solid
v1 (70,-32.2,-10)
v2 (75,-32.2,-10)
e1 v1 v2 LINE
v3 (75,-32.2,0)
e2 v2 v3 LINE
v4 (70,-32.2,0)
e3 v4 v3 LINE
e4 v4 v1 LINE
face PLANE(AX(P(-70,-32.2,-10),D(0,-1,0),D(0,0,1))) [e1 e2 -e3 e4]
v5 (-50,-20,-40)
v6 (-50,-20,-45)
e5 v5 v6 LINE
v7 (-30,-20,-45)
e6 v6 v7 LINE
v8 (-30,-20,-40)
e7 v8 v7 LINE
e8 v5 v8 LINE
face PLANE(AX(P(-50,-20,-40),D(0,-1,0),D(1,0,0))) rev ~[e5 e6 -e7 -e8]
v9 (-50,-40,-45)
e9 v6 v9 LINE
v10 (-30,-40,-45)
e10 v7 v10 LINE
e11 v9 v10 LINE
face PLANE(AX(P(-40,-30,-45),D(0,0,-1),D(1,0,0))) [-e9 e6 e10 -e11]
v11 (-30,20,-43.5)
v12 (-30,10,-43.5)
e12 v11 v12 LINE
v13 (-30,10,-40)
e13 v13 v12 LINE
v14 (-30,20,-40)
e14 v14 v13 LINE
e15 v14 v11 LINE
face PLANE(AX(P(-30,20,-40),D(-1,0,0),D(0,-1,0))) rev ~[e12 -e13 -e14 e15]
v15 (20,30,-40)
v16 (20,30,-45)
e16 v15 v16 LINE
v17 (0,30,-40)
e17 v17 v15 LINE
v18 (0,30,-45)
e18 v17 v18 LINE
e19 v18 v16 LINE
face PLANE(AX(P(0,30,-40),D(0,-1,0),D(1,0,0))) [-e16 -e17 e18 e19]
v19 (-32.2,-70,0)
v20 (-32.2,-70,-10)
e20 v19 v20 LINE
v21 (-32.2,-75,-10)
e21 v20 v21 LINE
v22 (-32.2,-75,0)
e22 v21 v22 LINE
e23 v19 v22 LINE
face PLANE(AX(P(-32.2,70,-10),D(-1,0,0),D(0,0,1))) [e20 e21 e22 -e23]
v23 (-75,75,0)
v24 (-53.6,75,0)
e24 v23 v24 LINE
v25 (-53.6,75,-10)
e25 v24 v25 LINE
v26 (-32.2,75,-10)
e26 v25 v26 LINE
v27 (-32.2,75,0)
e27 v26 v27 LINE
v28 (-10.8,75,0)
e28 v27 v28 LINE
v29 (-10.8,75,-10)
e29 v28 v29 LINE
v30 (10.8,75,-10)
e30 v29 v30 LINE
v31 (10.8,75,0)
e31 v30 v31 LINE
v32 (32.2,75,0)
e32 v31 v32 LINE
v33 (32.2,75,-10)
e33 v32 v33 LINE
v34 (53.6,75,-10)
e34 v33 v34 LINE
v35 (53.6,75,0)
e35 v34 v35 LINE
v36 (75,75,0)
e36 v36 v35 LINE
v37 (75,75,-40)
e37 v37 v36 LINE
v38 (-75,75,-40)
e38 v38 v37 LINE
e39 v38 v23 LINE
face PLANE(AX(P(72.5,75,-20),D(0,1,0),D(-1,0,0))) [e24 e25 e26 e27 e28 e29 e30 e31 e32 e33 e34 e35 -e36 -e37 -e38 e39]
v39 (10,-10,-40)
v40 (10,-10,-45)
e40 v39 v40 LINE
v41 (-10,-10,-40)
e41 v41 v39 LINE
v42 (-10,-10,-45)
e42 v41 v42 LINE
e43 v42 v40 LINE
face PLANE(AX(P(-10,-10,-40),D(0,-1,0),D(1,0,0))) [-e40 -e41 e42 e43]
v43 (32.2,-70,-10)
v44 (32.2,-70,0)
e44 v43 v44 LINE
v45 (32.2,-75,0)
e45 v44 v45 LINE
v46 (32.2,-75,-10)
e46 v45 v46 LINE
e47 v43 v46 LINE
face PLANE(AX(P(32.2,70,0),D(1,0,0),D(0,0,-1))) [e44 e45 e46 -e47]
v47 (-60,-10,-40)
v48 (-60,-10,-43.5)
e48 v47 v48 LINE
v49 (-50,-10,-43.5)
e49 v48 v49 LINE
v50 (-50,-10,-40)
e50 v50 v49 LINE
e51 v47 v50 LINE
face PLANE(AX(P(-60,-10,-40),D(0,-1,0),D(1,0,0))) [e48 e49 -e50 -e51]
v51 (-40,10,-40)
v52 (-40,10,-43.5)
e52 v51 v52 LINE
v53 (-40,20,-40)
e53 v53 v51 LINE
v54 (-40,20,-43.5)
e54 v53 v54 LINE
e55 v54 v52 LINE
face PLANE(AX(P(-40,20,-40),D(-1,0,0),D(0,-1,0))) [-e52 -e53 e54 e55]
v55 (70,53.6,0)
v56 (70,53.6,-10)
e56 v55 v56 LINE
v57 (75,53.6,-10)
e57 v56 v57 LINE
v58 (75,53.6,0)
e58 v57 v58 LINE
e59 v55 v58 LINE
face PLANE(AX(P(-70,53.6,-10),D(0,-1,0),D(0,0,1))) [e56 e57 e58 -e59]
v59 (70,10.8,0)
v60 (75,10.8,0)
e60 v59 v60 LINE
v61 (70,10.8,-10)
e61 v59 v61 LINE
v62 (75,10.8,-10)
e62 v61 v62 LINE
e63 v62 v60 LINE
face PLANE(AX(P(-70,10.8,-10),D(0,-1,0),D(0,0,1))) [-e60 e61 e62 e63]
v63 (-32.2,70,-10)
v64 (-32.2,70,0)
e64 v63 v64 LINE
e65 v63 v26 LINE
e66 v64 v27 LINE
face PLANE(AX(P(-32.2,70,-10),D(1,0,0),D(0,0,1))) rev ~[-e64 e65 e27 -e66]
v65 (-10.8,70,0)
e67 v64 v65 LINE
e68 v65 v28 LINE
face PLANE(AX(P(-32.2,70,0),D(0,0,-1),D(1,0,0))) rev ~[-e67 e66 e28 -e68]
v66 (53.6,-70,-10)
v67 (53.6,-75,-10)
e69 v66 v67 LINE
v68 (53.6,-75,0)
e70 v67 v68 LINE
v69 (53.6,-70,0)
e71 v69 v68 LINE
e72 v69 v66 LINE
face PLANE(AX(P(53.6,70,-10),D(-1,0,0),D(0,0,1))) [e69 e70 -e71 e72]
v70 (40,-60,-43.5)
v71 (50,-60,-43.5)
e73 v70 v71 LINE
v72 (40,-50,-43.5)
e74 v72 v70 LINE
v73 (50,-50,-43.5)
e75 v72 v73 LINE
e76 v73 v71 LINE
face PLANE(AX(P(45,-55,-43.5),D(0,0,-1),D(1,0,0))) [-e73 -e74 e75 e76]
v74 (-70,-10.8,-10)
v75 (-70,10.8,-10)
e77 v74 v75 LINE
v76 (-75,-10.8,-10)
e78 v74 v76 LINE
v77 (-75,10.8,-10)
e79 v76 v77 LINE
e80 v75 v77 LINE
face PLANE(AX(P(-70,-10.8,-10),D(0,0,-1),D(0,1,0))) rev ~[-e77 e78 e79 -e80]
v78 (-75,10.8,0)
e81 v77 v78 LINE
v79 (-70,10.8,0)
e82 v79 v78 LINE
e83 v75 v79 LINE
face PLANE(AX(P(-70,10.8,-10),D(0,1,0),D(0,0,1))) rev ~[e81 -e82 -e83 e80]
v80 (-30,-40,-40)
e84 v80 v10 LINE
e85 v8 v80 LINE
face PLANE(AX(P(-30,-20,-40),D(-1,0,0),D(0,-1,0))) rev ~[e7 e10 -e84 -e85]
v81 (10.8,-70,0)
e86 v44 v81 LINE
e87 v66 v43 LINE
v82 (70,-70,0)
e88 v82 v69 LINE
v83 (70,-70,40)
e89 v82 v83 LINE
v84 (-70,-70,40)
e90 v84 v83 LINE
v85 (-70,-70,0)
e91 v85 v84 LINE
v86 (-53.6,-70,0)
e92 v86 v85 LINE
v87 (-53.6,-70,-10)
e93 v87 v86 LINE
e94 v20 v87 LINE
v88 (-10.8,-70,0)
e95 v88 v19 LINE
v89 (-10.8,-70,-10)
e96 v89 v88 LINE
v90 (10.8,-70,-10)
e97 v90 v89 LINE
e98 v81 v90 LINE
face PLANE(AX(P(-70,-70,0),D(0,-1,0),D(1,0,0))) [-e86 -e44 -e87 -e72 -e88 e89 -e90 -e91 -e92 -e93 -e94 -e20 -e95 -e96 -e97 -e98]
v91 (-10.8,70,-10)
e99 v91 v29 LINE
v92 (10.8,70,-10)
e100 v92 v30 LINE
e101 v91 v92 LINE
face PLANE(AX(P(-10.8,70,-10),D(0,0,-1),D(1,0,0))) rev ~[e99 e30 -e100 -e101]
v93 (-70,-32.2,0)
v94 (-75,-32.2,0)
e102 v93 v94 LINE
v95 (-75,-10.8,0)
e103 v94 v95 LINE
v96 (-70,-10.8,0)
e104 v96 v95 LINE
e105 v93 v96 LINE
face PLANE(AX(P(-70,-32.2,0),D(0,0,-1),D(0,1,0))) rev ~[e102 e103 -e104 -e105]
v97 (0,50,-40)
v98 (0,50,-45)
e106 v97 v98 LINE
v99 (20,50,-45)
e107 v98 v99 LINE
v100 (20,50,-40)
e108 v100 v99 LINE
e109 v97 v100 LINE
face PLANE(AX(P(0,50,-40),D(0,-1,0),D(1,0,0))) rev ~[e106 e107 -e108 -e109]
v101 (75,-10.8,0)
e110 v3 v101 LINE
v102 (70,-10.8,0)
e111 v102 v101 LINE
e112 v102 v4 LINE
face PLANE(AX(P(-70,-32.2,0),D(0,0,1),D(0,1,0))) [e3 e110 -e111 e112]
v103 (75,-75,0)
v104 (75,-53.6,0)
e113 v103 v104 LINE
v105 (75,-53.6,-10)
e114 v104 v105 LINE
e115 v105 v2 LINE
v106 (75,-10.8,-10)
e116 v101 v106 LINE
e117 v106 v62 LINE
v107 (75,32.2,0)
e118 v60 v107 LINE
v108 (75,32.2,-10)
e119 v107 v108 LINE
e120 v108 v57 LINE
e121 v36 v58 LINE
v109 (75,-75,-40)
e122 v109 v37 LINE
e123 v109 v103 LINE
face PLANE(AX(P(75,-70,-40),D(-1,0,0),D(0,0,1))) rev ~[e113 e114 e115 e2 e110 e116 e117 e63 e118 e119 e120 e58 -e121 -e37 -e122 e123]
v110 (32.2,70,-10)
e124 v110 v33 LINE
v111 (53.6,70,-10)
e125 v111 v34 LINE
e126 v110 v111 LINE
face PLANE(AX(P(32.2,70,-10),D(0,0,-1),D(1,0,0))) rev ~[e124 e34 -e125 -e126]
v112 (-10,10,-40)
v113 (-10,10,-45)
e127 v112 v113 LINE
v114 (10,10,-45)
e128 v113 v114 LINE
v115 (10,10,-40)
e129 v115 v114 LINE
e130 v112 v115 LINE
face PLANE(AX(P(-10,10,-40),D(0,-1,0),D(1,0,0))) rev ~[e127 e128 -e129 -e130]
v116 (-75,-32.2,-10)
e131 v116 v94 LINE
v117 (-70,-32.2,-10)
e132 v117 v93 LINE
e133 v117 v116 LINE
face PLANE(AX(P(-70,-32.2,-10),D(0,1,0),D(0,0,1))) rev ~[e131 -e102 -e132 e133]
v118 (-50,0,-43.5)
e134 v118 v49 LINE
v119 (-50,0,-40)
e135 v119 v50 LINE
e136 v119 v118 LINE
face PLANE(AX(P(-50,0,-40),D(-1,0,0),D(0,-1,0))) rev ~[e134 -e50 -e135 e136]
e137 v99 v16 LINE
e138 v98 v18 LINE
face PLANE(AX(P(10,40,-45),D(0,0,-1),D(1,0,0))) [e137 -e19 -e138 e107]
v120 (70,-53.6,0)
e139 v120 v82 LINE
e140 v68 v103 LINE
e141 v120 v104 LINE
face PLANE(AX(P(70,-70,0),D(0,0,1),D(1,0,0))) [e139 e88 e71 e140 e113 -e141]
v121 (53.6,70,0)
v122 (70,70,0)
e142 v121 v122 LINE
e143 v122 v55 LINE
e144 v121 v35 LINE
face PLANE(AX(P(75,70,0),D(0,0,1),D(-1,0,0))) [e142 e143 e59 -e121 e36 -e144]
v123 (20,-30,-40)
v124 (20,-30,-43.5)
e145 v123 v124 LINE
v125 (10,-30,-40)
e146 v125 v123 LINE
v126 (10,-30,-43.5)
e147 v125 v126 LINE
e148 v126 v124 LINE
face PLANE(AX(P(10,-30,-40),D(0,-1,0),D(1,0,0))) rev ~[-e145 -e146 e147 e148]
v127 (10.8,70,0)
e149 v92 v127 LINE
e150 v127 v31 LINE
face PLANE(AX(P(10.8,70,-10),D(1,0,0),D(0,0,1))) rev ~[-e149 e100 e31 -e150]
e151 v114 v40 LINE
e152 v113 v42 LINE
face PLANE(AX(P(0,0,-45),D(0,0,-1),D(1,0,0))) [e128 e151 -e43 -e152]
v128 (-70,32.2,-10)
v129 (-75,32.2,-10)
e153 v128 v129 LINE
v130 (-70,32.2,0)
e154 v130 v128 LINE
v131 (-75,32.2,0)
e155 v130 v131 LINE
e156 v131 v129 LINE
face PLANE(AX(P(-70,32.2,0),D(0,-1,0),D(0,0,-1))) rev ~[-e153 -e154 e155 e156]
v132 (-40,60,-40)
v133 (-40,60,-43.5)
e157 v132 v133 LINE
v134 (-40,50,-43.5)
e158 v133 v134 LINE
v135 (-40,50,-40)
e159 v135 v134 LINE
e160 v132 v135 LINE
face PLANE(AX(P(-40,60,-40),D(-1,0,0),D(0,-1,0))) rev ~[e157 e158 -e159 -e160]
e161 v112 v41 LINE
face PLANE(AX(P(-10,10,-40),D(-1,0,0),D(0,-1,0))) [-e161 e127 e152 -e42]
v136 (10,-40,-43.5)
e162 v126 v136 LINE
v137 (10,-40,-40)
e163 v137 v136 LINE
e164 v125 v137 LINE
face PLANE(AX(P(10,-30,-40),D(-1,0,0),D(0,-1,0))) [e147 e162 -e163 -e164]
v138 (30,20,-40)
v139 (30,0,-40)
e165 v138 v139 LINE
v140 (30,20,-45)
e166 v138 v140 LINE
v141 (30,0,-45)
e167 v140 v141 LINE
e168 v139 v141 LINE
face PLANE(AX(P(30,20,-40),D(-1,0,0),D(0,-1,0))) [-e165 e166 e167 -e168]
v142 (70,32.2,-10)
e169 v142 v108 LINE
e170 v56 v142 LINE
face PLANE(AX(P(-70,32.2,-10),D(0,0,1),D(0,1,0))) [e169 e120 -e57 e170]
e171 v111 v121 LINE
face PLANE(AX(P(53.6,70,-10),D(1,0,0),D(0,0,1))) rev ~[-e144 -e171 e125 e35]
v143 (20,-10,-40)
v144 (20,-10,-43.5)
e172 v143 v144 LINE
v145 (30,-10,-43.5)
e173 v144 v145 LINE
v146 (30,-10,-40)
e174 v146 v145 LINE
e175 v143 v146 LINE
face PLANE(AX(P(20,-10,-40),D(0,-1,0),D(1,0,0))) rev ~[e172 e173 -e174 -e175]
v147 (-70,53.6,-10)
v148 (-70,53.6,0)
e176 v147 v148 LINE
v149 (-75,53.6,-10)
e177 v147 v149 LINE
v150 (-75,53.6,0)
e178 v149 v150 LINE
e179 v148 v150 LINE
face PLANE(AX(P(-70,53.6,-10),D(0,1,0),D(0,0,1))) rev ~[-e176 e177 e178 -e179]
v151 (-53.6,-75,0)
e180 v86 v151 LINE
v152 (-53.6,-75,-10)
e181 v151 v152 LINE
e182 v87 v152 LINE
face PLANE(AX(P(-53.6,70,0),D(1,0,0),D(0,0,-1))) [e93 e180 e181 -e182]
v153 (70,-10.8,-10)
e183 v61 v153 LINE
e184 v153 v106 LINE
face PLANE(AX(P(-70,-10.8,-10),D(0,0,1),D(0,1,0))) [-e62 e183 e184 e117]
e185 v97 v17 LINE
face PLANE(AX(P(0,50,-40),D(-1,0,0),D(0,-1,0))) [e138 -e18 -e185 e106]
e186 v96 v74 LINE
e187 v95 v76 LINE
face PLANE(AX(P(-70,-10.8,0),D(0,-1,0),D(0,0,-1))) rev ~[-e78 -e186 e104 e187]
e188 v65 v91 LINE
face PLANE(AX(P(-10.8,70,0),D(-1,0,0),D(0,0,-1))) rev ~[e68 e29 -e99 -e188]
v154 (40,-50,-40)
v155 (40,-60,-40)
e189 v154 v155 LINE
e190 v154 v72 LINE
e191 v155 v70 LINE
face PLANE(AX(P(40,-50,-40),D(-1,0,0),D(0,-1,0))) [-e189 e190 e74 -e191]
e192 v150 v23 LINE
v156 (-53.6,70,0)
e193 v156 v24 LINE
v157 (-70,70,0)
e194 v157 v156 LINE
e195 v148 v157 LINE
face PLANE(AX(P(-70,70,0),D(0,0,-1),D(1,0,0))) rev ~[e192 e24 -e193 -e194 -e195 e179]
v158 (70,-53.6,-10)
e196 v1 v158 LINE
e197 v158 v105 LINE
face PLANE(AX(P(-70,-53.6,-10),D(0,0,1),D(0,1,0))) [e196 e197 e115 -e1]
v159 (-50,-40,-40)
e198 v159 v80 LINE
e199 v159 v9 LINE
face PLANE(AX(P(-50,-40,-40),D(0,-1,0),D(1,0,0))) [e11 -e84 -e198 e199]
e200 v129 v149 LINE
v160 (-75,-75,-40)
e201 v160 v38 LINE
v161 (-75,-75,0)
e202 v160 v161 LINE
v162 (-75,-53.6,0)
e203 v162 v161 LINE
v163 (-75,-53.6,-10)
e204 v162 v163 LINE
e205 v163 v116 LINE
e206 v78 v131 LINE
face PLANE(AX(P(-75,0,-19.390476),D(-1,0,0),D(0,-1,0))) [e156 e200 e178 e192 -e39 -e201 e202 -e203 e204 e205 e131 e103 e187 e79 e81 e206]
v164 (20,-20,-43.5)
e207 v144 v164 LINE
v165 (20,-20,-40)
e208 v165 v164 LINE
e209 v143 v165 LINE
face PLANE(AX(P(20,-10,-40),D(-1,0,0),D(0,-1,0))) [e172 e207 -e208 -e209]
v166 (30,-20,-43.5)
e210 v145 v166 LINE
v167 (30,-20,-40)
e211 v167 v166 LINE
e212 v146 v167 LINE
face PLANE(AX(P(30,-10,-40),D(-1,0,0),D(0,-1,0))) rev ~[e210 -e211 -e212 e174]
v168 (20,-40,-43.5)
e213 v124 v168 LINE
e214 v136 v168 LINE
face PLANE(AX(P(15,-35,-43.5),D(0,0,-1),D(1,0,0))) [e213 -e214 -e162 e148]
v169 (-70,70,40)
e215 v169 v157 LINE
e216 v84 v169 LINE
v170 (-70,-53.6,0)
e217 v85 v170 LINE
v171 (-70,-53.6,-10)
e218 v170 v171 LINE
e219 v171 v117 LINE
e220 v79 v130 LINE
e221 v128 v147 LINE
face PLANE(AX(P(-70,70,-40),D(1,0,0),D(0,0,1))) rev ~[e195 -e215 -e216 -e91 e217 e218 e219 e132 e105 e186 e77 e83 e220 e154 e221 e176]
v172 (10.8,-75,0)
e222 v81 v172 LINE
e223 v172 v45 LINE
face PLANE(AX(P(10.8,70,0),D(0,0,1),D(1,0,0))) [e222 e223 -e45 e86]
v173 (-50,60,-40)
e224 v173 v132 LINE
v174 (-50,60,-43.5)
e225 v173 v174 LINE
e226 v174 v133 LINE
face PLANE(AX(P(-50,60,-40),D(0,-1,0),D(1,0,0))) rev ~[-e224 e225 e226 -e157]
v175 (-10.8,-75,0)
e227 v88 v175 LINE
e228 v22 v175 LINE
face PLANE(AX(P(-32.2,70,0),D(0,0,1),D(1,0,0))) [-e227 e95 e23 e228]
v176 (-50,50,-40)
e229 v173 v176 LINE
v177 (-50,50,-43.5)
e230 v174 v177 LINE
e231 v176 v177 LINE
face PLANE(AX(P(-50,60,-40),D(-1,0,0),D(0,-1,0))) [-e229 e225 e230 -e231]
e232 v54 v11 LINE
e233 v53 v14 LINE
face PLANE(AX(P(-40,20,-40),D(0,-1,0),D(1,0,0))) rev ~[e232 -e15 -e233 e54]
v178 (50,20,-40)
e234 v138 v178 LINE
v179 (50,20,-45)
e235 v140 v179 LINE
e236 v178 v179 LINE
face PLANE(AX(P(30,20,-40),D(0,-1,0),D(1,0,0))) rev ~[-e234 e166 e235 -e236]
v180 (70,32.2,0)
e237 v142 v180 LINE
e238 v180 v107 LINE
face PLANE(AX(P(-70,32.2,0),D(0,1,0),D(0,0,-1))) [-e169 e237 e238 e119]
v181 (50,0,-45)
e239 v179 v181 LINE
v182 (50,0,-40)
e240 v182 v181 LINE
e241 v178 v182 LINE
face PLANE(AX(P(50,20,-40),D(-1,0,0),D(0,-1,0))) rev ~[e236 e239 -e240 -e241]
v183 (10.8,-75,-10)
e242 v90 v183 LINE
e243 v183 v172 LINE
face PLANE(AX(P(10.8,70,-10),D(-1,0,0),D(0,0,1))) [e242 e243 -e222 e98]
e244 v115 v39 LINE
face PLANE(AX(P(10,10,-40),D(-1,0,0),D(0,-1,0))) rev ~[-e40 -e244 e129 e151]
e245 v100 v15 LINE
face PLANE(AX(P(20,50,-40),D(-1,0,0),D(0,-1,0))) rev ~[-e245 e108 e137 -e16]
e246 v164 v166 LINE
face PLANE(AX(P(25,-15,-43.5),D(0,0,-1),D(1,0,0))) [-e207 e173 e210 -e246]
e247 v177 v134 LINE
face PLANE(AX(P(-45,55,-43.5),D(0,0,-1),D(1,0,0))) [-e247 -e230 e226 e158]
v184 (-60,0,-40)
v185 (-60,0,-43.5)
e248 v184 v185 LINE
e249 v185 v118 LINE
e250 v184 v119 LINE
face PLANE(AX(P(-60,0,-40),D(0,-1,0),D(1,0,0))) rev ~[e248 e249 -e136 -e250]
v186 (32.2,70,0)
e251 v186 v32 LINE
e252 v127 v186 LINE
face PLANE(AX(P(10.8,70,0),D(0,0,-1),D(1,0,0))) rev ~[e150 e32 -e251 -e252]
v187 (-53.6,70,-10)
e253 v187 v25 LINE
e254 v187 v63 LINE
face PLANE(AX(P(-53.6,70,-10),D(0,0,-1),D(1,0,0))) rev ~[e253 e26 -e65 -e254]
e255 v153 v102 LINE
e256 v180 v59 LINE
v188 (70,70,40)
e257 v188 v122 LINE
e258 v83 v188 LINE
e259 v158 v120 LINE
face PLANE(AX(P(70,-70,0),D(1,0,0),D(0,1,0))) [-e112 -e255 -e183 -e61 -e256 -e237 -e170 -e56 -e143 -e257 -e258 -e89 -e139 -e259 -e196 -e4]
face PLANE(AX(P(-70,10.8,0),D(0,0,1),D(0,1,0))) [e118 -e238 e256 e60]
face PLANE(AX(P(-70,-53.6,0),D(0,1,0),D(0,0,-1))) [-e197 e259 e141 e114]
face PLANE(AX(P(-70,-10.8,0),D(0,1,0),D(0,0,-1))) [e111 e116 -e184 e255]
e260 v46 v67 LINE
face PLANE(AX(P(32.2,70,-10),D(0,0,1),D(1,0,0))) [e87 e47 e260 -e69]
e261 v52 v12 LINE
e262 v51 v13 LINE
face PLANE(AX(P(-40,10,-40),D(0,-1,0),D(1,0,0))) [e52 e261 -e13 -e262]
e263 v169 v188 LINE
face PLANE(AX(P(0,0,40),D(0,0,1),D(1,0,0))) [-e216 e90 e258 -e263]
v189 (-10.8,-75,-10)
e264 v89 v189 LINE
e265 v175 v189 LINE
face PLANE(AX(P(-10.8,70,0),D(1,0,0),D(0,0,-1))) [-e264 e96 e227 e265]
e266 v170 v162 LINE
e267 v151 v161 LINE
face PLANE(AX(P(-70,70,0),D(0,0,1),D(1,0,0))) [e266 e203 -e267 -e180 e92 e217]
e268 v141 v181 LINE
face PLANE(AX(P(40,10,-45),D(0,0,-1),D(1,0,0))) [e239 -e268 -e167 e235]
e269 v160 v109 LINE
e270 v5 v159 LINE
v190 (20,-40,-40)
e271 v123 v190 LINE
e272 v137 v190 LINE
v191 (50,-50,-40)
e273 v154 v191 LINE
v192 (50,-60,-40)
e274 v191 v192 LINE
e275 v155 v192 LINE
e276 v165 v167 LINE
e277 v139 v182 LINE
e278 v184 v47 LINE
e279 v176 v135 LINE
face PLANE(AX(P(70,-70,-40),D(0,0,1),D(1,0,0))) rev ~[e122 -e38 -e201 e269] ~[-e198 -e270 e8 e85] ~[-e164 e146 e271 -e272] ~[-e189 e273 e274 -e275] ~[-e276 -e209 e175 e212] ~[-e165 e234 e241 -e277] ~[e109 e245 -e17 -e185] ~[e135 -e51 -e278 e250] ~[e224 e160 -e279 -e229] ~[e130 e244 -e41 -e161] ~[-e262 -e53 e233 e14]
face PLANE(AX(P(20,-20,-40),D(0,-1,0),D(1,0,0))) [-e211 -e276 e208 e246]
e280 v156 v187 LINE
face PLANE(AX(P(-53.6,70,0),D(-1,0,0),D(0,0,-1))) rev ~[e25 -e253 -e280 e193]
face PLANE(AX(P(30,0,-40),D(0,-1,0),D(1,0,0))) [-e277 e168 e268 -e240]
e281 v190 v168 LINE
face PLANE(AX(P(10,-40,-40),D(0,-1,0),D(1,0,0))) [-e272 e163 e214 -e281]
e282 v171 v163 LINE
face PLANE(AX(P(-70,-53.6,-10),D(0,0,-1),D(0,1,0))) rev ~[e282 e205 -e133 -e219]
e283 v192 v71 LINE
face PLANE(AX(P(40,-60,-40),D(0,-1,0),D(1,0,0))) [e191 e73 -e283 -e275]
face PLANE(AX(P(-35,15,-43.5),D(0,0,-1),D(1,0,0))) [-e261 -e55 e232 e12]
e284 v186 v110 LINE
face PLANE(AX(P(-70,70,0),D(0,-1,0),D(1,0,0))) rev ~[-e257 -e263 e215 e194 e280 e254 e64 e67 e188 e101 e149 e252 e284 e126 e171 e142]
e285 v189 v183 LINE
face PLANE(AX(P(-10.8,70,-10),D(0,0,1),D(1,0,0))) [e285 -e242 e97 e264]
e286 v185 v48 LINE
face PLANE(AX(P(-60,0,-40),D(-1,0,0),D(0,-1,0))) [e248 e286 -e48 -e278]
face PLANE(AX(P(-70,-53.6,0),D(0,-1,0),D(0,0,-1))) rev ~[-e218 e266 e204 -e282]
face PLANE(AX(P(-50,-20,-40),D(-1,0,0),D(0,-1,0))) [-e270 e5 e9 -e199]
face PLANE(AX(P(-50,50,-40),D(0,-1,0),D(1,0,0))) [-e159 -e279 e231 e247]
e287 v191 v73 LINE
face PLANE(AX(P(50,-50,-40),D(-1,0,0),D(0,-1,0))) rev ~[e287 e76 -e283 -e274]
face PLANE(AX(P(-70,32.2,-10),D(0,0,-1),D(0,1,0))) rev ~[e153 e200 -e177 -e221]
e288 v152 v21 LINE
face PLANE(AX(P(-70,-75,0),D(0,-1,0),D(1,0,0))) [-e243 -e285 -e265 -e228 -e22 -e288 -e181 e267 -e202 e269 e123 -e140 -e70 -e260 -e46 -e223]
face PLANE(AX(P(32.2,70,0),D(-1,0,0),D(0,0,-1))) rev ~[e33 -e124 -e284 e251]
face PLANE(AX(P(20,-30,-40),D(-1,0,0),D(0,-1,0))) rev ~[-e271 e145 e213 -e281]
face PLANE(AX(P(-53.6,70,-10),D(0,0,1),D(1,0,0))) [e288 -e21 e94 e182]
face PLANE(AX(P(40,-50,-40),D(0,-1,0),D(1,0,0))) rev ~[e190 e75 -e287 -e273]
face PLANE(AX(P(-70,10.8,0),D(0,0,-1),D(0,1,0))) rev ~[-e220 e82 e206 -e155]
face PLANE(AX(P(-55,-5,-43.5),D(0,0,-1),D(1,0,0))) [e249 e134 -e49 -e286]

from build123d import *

# Parameters (mm, degrees)
F0_W      = 140
F0_H      = 140
F1_DEPTH  = 40
F4_DEPTH  = 145
F5_DEPTH  = 145
F6_DEPTH  = 5
F7_DEPTH  = 5
F2_W      = 5
F2_H      = 40
F8_DEPTH  = 5
F9_DEPTH  = 5
F10_W     = 10
F10_H     = 10
F11_DEPTH = 3.5
F10_W_2   = 20
F10_H_2   = 20
F12_DEPTH = 5


with BuildPart() as f1:
    # F0 (on Top) → F1 (new body, symmetric)
    with BuildSketch(Plane.XY):
        Rectangle(F0_W, F0_H)
    extrude(amount=F1_DEPTH, both=True)

    # F3 (on face) → F4 (join)
    with BuildSketch(Plane(origin=(-70, 0, 0), x_dir=(0, -1, 0), z_dir=(-1, 0, 0))):
        Polygon((-70, -40), (70, -40), (70, 0), (53.6, 0), (53.6, -10), (32.2, -10), (32.2, 0), (10.8, 0), (10.8, -10), (-10.8, -10), (-10.8, 0), (-32.2, 0), (-32.2, -10), (-53.6, -10), (-53.6, 0), (-70, 0), align=None)
    extrude(amount=-F4_DEPTH)

    # F2 (on face) → F5 (join)
    with BuildSketch(Plane(origin=(0, 70, 0), x_dir=(-1, 0, 0), z_dir=(0, 1, 0))):
        Polygon((-70, -40), (70, -40), (70, 0), (53.6, 0), (53.6, -10), (32.2, -10), (32.2, 0), (10.8, 0), (10.8, -10), (-10.8, -10), (-10.8, 0), (-32.2, 0), (-32.2, -10), (-53.6, -10), (-53.6, 0), (-70, 0), align=None)
    extrude(amount=-F5_DEPTH)

    # F2 (on face) → F6 (join)
    with BuildSketch(Plane(origin=(0, 70, 0), x_dir=(-1, 0, 0), z_dir=(0, 1, 0))):
        Polygon((-70, -40), (70, -40), (70, 0), (53.6, 0), (53.6, -10), (32.2, -10), (32.2, 0), (10.8, 0), (10.8, -10), (-10.8, -10), (-10.8, 0), (-32.2, 0), (-32.2, -10), (-53.6, -10), (-53.6, 0), (-70, 0), align=None)
    extrude(amount=F6_DEPTH)

    # F3 (on face) → F7 (join)
    with BuildSketch(Plane(origin=(-70, 0, 0), x_dir=(0, -1, 0), z_dir=(-1, 0, 0))):
        Polygon((-70, -40), (70, -40), (70, 0), (53.6, 0), (53.6, -10), (32.2, -10), (32.2, 0), (10.8, 0), (10.8, -10), (-10.8, -10), (-10.8, 0), (-32.2, 0), (-32.2, -10), (-53.6, -10), (-53.6, 0), (-70, 0), align=None)
    extrude(amount=F7_DEPTH)

    # F2 (on face) → F8 (join, through all)
    with BuildSketch(Plane(origin=(0, 70, 0), x_dir=(-1, 0, 0), z_dir=(0, 1, 0))):
        with Locations((-72.5, -20)):
            Rectangle(F2_W, F2_H)
        with Locations((72.5, -20)):
            Rectangle(F2_W, F2_H)
    extrude(amount=F8_DEPTH)

    # F9 (add, through all): faces of the model
    f9_faces = [f1.faces().sort_by_distance(p)[0] for p in [
        (72.5, -70, -20),
        (-72.5, -70, -20),
    ]]
    extrude(f9_faces, amount=F9_DEPTH)

    # F10 (on face) → F11 (join)
    with BuildSketch(Plane(origin=(0, 0, -40), x_dir=(1, 0, 0), z_dir=(0, 0, -1))):
        with Locations((-55, 5)):
            Rectangle(F10_W, F10_H)
        with Locations((-35, -15)):
            Rectangle(F10_W, F10_H)
        with Locations((-45, -55)):
            Rectangle(F10_W, F10_H)
        with Locations((25, 15)):
            Rectangle(F10_W, F10_H)
        with Locations((15, 35)):
            Rectangle(F10_W, F10_H)
        with Locations((45, 55)):
            Rectangle(F10_W, F10_H)
    extrude(amount=F11_DEPTH)

    # F10 (on face) → F12 (join)
    with BuildSketch(Plane(origin=(0, 0, -40), x_dir=(1, 0, 0), z_dir=(0, 0, -1))):
        with Locations((40, -10)):
            Rectangle(F10_W_2, F10_H_2)
        Rectangle(F10_W_2, F10_H_2)
        with Locations((-40, 30)):
            Rectangle(F10_W_2, F10_H_2)
        with Locations((10, -40)):
            Rectangle(F10_W_2, F10_H_2)
    extrude(amount=F12_DEPTH)


solid = f1.part
